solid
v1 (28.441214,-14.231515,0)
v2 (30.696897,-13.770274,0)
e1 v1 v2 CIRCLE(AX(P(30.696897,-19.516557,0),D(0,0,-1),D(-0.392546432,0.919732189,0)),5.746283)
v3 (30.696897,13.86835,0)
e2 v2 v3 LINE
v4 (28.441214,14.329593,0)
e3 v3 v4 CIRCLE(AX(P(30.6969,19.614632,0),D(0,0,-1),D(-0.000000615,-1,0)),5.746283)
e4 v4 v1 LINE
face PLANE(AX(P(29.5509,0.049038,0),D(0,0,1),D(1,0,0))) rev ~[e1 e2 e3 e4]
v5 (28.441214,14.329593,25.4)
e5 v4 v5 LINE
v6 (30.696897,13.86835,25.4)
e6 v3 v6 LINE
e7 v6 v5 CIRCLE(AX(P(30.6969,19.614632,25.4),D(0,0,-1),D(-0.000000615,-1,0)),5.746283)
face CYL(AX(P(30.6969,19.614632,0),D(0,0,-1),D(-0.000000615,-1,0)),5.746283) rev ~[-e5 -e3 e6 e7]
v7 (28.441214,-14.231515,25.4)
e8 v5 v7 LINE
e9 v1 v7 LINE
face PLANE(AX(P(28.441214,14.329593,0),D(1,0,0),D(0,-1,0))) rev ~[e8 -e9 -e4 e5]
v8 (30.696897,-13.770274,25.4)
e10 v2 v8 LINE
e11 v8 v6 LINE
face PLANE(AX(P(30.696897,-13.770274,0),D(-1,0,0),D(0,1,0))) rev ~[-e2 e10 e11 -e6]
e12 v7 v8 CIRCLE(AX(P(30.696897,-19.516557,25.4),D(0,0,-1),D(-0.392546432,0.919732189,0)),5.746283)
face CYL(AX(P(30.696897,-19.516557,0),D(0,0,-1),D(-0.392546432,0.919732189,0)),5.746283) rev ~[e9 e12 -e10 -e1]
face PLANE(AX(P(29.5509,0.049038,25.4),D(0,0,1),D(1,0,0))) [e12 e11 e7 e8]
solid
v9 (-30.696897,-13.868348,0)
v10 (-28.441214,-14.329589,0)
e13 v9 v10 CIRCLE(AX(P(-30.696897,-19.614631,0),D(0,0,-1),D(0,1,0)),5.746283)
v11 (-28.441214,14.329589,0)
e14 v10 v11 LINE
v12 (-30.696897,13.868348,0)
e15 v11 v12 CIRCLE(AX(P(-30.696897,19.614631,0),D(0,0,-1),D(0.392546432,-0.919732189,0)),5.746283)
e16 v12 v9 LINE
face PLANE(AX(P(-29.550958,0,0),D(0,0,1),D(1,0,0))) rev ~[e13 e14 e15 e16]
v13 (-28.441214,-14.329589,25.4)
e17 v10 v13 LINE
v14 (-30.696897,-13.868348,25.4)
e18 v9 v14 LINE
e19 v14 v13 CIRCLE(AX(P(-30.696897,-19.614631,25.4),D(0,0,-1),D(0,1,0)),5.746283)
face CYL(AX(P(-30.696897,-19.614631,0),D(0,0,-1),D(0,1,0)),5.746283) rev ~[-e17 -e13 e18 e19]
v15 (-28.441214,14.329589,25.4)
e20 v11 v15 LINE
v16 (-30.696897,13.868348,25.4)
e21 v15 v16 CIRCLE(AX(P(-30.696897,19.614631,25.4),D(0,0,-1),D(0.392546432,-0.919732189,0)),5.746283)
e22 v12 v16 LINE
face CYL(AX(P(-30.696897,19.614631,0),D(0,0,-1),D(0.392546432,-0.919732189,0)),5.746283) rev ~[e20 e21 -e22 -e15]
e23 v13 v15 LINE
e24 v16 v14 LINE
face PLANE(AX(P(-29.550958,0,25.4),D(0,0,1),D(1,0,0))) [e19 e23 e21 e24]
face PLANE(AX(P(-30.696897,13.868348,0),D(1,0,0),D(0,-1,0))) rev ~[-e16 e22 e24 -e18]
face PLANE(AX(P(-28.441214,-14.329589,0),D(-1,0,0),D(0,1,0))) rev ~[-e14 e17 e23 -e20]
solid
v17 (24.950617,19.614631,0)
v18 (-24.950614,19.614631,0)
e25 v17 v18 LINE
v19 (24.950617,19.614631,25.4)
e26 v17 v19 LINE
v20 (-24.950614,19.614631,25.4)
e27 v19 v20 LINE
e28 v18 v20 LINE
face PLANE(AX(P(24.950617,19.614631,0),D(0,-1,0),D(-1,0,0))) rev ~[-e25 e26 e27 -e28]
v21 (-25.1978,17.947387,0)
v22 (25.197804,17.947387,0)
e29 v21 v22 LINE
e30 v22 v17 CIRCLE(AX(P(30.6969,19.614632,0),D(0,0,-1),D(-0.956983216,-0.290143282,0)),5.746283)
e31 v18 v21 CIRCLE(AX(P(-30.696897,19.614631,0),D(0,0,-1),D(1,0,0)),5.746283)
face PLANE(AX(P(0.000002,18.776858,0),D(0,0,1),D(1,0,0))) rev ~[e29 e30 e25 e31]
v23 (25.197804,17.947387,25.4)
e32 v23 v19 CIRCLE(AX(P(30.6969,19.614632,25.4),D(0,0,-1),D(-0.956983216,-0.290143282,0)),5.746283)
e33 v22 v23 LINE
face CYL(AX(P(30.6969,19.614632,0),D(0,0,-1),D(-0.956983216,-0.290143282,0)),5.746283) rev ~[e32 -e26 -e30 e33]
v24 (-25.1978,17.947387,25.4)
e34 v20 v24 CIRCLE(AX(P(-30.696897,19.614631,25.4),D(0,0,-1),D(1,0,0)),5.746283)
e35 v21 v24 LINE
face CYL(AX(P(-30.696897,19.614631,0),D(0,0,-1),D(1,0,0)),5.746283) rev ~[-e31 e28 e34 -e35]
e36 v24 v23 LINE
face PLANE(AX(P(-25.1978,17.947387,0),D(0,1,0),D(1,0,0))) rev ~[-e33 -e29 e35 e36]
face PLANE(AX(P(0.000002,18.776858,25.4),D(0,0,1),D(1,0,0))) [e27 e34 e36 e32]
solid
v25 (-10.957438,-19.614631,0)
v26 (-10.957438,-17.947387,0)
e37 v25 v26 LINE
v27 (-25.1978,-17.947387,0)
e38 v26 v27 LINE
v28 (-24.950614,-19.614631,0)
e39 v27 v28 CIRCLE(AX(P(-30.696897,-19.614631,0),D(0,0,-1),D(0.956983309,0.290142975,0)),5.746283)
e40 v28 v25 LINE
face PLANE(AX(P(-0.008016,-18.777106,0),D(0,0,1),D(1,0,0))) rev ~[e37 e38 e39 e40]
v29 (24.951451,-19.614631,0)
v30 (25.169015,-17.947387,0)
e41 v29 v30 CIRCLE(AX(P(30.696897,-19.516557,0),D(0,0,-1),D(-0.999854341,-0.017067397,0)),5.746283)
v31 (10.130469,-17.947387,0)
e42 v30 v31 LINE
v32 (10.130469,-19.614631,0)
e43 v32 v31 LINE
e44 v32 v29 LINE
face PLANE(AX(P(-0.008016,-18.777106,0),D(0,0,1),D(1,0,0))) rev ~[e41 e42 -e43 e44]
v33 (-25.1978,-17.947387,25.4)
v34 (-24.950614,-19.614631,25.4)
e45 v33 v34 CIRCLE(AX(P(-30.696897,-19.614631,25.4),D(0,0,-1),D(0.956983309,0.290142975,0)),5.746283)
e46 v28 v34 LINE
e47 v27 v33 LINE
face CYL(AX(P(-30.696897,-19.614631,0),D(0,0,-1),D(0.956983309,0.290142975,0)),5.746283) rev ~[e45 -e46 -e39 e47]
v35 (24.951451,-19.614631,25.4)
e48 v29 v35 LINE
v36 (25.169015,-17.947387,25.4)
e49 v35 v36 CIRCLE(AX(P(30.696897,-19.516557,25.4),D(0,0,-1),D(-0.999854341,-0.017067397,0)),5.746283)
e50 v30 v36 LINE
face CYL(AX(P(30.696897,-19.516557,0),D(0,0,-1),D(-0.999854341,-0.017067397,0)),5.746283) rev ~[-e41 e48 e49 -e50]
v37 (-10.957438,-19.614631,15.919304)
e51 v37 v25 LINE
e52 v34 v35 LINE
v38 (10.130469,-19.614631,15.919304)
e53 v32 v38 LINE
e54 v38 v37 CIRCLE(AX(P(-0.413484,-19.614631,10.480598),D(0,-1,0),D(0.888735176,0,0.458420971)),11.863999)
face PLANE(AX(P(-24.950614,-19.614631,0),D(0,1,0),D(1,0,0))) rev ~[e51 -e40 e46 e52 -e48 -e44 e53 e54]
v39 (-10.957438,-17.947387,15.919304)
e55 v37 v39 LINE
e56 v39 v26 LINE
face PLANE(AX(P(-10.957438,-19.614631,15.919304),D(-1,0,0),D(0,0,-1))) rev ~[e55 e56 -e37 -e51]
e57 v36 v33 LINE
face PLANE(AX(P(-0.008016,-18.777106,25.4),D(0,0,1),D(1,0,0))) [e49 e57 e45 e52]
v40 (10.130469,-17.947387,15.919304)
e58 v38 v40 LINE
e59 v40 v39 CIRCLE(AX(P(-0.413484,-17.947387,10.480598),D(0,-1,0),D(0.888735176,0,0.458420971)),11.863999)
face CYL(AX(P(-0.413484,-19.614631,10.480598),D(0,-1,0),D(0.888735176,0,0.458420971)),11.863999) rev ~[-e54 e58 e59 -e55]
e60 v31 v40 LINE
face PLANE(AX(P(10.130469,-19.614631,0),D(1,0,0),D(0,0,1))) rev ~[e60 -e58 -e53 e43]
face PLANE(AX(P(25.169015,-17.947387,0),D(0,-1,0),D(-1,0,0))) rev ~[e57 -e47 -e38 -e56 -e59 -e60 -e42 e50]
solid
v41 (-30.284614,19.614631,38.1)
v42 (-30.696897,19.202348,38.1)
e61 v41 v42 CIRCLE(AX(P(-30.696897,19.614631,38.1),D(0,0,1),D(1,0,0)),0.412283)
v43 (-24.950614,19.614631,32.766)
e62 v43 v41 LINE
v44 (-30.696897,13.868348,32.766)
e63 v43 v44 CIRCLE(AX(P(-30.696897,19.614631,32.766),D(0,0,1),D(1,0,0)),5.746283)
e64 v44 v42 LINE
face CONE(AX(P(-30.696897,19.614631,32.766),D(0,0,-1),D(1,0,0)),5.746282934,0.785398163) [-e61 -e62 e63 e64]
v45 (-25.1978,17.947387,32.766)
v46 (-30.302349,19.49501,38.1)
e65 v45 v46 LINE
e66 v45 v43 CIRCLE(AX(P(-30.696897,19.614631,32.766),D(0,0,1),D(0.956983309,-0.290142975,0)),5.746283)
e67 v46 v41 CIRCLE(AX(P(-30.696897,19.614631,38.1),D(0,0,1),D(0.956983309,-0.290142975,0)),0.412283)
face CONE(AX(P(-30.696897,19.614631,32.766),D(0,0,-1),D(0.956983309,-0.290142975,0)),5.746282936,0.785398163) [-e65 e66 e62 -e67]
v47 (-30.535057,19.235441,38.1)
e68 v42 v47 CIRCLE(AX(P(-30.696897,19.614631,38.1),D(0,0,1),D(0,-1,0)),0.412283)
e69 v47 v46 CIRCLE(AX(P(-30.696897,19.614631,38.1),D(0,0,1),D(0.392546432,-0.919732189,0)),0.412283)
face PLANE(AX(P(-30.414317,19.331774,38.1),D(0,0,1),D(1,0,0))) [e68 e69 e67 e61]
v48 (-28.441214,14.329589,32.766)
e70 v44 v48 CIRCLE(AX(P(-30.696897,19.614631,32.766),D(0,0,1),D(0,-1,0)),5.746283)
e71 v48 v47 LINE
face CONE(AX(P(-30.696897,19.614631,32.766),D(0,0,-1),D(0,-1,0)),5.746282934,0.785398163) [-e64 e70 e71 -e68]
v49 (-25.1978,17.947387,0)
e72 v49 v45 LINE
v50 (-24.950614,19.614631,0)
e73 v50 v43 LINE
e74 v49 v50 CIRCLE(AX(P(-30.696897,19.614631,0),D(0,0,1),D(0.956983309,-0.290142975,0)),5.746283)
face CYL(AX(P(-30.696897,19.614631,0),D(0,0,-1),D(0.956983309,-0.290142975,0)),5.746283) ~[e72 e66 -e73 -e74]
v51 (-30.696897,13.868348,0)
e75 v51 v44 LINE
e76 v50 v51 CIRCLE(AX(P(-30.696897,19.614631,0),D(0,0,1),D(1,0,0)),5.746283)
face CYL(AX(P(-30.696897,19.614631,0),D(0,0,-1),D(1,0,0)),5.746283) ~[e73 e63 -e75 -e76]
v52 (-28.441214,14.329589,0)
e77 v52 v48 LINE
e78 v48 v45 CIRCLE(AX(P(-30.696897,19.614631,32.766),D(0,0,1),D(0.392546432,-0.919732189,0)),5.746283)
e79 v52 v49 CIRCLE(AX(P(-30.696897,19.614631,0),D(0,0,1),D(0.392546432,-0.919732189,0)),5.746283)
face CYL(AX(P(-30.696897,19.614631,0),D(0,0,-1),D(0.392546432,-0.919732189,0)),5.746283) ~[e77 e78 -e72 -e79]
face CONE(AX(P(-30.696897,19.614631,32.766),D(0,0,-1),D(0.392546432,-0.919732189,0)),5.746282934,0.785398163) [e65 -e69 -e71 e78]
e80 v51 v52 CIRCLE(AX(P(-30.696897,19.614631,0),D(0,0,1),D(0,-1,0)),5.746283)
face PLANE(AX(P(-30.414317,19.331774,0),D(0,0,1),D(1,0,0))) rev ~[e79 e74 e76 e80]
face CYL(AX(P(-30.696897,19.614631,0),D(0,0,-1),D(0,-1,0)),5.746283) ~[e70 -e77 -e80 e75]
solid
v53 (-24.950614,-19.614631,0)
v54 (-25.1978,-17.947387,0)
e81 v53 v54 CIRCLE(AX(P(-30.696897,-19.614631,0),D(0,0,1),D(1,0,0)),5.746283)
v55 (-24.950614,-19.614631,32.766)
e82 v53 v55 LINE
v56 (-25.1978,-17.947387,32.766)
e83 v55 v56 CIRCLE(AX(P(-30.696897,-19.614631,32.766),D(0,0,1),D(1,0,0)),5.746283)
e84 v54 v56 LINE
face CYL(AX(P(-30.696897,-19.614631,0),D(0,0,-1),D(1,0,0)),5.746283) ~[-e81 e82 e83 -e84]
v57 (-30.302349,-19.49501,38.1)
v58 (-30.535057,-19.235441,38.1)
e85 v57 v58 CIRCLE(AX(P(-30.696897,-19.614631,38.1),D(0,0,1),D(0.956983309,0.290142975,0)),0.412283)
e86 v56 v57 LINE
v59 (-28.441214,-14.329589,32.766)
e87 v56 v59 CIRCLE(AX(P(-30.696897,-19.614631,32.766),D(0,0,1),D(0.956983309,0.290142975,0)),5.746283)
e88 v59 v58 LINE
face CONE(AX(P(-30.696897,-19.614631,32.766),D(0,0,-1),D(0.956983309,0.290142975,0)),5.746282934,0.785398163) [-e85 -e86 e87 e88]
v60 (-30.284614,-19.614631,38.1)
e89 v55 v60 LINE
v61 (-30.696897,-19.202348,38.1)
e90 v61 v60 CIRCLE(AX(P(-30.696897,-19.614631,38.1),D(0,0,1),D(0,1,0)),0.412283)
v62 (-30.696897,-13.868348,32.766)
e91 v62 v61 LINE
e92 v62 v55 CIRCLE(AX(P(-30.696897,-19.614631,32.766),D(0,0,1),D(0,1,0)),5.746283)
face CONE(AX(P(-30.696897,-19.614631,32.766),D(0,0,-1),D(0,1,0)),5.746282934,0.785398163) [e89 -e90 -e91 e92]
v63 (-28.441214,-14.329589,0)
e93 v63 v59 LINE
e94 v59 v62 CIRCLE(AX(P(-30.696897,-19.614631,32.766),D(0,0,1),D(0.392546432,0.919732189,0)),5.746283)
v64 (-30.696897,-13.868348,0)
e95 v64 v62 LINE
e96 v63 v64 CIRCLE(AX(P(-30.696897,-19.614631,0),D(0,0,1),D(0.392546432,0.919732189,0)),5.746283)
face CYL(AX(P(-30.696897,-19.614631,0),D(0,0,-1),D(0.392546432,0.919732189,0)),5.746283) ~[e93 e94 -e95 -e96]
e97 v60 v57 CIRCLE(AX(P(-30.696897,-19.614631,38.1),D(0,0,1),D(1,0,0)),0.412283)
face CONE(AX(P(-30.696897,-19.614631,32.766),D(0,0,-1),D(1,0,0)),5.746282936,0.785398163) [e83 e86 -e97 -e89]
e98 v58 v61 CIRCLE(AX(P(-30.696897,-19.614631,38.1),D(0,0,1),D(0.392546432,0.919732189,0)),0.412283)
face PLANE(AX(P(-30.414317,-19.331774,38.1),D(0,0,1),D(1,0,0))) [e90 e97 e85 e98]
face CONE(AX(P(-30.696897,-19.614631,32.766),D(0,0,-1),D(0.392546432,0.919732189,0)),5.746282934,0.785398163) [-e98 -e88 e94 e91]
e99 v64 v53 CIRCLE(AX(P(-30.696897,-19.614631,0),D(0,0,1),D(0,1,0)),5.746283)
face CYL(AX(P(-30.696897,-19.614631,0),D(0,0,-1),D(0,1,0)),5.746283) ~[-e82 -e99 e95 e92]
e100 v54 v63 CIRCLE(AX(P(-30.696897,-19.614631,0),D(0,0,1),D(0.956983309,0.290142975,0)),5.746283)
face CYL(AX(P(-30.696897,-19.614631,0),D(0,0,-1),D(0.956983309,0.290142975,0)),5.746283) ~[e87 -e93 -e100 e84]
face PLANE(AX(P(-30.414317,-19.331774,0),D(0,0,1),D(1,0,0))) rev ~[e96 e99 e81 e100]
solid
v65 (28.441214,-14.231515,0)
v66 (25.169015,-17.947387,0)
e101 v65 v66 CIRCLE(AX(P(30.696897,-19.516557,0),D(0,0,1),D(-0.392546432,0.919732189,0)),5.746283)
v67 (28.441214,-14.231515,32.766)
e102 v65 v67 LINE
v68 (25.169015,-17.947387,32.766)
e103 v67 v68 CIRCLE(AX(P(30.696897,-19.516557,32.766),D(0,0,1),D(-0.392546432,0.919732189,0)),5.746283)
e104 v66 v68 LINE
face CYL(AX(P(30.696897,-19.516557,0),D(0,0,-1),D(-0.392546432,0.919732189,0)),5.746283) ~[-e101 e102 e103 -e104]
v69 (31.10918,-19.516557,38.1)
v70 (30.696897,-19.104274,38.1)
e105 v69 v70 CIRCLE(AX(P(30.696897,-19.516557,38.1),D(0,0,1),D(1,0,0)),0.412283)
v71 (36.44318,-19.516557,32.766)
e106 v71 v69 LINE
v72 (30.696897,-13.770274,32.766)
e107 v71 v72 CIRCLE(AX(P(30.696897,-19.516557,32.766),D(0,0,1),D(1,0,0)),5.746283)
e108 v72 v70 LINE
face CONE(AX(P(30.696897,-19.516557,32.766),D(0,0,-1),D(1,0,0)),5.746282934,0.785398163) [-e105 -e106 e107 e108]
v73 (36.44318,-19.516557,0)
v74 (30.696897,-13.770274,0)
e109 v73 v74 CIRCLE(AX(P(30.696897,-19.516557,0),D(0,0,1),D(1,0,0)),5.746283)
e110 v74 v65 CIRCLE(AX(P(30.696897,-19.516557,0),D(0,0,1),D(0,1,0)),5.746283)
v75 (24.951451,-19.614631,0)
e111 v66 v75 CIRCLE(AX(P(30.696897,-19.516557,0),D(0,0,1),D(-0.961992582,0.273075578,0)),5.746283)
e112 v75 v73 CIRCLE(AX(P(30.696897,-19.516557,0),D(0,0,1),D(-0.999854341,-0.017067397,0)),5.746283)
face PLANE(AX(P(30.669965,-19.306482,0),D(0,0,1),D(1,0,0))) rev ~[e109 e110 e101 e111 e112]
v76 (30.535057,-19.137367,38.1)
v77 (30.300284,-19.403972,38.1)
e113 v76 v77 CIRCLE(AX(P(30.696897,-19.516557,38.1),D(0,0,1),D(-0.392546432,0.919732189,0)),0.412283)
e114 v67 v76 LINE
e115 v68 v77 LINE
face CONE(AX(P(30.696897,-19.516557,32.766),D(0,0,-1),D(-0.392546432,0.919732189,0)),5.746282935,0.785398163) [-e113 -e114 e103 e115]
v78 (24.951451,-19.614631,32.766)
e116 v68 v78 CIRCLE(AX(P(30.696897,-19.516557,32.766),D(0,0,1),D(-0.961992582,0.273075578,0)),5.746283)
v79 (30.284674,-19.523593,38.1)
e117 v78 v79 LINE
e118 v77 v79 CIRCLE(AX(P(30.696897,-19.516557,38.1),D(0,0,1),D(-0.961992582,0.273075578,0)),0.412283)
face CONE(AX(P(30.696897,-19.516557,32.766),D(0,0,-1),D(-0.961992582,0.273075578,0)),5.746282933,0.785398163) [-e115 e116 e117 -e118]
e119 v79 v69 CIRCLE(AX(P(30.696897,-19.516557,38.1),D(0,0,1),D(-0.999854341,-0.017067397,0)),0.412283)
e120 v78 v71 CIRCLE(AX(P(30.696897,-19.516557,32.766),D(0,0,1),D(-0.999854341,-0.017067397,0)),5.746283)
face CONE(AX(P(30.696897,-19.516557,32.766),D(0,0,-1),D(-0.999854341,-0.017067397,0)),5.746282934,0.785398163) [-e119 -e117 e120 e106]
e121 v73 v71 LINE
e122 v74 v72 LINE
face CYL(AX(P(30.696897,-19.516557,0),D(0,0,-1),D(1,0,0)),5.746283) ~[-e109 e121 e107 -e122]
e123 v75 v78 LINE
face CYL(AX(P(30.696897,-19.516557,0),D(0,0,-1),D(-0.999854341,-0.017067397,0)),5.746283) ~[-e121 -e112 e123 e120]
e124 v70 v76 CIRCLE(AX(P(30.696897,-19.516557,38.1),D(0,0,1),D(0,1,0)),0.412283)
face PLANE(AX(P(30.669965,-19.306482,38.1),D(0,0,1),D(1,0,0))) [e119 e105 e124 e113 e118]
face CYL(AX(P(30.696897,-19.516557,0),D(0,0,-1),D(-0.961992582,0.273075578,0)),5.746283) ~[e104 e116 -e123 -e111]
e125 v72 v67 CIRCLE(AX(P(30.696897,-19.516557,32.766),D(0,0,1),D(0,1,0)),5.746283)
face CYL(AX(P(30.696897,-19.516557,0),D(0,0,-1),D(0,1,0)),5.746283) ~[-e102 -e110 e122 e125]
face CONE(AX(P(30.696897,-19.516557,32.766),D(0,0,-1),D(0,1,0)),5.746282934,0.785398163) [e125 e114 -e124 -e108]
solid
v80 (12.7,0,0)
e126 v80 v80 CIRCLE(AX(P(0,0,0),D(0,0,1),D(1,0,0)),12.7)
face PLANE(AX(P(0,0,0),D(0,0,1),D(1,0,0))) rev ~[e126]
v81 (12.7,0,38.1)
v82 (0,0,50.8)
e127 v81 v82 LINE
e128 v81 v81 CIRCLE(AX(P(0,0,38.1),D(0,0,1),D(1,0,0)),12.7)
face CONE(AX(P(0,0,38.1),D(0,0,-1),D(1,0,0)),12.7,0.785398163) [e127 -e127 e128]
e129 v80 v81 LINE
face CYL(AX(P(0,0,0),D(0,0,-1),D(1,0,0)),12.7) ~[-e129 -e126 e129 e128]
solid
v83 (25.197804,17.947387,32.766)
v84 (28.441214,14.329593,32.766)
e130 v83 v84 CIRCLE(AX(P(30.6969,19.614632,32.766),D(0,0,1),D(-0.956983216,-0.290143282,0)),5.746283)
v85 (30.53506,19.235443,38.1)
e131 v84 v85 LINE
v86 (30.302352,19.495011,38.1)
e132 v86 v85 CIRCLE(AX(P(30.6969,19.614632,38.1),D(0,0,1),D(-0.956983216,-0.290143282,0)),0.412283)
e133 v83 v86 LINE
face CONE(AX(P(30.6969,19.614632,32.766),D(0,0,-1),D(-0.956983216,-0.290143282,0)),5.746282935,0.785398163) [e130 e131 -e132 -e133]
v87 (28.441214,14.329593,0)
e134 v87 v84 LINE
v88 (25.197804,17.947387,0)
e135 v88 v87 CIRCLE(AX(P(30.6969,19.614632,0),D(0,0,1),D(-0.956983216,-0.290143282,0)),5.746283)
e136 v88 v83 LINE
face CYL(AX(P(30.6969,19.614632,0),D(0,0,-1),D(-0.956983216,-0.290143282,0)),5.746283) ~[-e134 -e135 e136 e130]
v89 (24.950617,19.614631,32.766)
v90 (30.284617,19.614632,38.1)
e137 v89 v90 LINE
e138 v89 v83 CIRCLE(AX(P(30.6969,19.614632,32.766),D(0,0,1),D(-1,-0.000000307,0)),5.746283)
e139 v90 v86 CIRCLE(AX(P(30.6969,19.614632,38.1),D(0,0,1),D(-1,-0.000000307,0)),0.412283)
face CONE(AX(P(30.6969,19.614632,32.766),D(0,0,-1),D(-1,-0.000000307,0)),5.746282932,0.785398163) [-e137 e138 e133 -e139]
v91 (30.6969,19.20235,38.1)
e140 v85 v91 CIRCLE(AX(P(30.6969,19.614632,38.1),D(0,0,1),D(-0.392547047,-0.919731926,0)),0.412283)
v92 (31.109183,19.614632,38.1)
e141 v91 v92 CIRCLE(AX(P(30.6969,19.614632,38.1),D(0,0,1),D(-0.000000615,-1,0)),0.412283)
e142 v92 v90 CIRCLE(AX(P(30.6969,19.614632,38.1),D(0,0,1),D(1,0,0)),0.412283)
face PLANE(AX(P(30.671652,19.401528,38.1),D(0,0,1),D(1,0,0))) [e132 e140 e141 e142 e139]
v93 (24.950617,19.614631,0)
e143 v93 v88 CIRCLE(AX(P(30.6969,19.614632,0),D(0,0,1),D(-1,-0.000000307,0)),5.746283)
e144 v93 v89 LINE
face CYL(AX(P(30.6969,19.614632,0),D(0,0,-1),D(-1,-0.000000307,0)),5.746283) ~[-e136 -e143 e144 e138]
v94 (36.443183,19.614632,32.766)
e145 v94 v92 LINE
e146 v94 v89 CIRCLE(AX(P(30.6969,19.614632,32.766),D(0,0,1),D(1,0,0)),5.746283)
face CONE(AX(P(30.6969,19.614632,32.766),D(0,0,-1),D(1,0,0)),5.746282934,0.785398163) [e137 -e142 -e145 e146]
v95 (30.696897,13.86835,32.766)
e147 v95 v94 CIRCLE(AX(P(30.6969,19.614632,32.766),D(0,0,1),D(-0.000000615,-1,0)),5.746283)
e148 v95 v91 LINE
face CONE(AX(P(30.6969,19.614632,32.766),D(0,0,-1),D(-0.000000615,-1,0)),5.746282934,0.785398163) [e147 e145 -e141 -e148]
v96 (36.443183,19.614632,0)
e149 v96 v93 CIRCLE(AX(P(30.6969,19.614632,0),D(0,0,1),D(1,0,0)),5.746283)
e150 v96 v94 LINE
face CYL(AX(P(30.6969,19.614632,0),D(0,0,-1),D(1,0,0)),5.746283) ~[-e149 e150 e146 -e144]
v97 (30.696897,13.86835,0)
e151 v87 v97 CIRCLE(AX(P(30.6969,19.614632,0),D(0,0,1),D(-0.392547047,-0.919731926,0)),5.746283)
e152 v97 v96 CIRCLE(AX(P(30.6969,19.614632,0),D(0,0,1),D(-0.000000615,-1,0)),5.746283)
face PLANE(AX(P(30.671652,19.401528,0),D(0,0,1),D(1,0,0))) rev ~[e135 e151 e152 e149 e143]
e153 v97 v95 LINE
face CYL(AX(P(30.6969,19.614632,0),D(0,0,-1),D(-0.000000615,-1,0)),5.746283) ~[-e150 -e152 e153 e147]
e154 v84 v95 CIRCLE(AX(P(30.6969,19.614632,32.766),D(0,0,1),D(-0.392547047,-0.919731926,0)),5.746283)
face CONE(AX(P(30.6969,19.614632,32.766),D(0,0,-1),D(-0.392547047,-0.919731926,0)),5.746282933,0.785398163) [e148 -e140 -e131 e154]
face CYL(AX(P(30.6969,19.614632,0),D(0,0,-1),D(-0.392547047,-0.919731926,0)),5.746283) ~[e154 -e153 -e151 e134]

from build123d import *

# Parameters (mm, degrees)
F1_DEPTH  = 25.4
F2_DEPTH  = 38.1
F0_R      = 12.7
F3_DEPTH  = 50.8
F5_DEPTH  = 25.4
F6_SIZE   = 12.7
F7_SIZE   = 5.334
F7_2_SIZE = 5.334
F7_3_SIZE = 5.334
F7_4_SIZE = 5.334


# Not quite as in the source:
# - a feature names something its author has since deleted; it is built from what else it names


with BuildPart() as f1:
    # F0 (on Top) → F1 (new body)
    with BuildSketch(Plane.XY):
        with BuildLine():
            Line((24.9506174104, 19.6146306736), (-24.950613876, 19.6146306736))
            ThreePointArc((-24.950613876, 19.6146306736), (-25.0127463025, 18.7718966911), (-25.1977999521, 17.9473870487))
            Line((-25.1977999521, 17.9473870487), (25.1978040222, 17.9473870487))
            ThreePointArc((25.1978040222, 17.9473870487), (25.0127501018, 18.771896671), (24.9506174104, 19.6146306736))
        make_face()
    extrude(amount=F1_DEPTH)


with BuildPart() as f1b:
    # F0 (on Top) → F1, piece 2 (new body)
    with BuildSketch(Plane.XY):
        with BuildLine():
            Line((-30.6968968099, 13.8683477398), (-30.6968968099, -13.8683477398))
            ThreePointArc((-30.6968968099, -13.8683477398), (-29.54571818, -13.9848389086), (-28.4412139466, -14.3295892948))
            Line((-28.4412139466, -14.3295892948), (-28.4412139466, 14.3295892948))
            ThreePointArc((-28.4412139466, 14.3295892948), (-29.54571818, 13.9848389086), (-30.6968968099, 13.8683477398))
        make_face()
    extrude(amount=F1_DEPTH)


with BuildPart() as f1c:
    # F0 (on Top) → F1, piece 3 (new body)
    with BuildSketch(Plane.XY):
        with BuildLine():
            ThreePointArc((-25.1977999521, -17.9473870487), (-25.0127463025, -18.7718966911), (-24.950613876, -19.6146306736))
            Line((-24.950613876, -19.6146306736), (24.9514508717, -19.6146306736))
            ThreePointArc((24.9514508717, -19.6146306736), (24.9989231754, -18.7730083224), (25.1690152512, -17.9473870487))
            Line((25.1690152512, -17.9473870487), (-25.1977999521, -17.9473870487))
        make_face()
    extrude(amount=F1_DEPTH)

    # F4 (on face) → F5 (cut)
    with BuildSketch(Plane.XZ.offset(19.6146306736)):
        with BuildLine():
            Line((-10.9574375674, 15.9193035215), (-10.9574375674, 0))
            Line((-10.9574375674, 0), (10.130468756, 0))
            Line((10.130468756, 0), (10.130468756, 15.9193035215))
            ThreePointArc((10.130468756, 15.9193035215), (-0.4134844057, 22.3445965305), (-10.9574375674, 15.9193035215))
        make_face()
    extrude(amount=-F5_DEPTH, mode=Mode.SUBTRACT)


with BuildPart() as f1d:
    # F0 (on Top) → F1, piece 4 (new body)
    with BuildSketch(Plane.XY):
        with BuildLine():
            Line((28.4412139466, 14.3295925704), (28.4412139466, -14.2315152048))
            ThreePointArc((28.4412139466, -14.2315152048), (29.54571818, -13.8867648186), (30.6968968099, -13.7702736498))
            Line((30.6968968099, -13.7702736498), (30.6968968099, 13.868349507))
            ThreePointArc((30.6968968099, 13.868349507), (29.5457181005, 13.9848414147), (28.4412139466, 14.3295925704))
        make_face()
    extrude(amount=F1_DEPTH)


with BuildPart() as f2:
    # F0 (on Top) → F2 (new body)
    with BuildSketch(Plane.XY):
        with BuildLine():
            ThreePointArc((-24.950613876, 19.6146306736), (-34.760132439, 23.6778663028), (-30.6968968099, 13.8683477398))
            ThreePointArc((-30.6968968099, 13.8683477398), (-29.54571818, 13.9848389086), (-28.4412139466, 14.3295892948))
            ThreePointArc((-28.4412139466, 14.3295892948), (-26.4183144188, 15.778812602), (-25.1977999521, 17.9473870487))
            ThreePointArc((-25.1977999521, 17.9473870487), (-25.0127463025, 18.7718966911), (-24.950613876, 19.6146306736))
        make_face()
    extrude(amount=F2_DEPTH)

    # F7
    f7_edges = [f2.edges().sort_by_distance(p)[0] for p in [
        (-30.696897, 25.360914, 38.1),
    ]]
    chamfer(f7_edges, length=F7_SIZE)


with BuildPart() as f2b:
    # F0 (on Top) → F2, piece 2 (new body)
    with BuildSketch(Plane.XY):
        with BuildLine():
            ThreePointArc((25.1978040222, 17.9473870487), (26.4183172869, 15.7788151124), (28.4412139466, 14.3295925704))
            ThreePointArc((28.4412139466, 14.3295925704), (29.5457181005, 13.9848414147), (30.6968968099, 13.868349507))
            ThreePointArc((30.6968968099, 13.868349507), (34.7601347238, 15.5513955621), (36.4431832781, 19.6146324408))
            ThreePointArc((36.4431832781, 19.6146324408), (30.6968994606, 25.3609153747), (24.9506174104, 19.6146306736))
            ThreePointArc((24.9506174104, 19.6146306736), (25.0127501018, 18.771896671), (25.1978040222, 17.9473870487))
        make_face()
    extrude(amount=F2_DEPTH)

    # F7#2
    f7_2_edges = [f2b.edges().sort_by_distance(p)[0] for p in [
        (36.443183, 19.614634, 38.1),
    ]]
    chamfer(f7_2_edges, length=F7_2_SIZE)


with BuildPart() as f2c:
    # F0 (on Top) → F2, piece 3 (new body)
    with BuildSketch(Plane.XY):
        with BuildLine():
            ThreePointArc((-30.6968968099, -13.8683477398), (-34.760132439, -23.6778663028), (-24.950613876, -19.6146306736))
            ThreePointArc((-24.950613876, -19.6146306736), (-25.0127463025, -18.7718966911), (-25.1977999521, -17.9473870487))
            ThreePointArc((-25.1977999521, -17.9473870487), (-26.4183144188, -15.778812602), (-28.4412139466, -14.3295892948))
            ThreePointArc((-28.4412139466, -14.3295892948), (-29.54571818, -13.9848389086), (-30.6968968099, -13.8683477398))
        make_face()
    extrude(amount=F2_DEPTH)

    # F7#3
    f7_3_edges = [f2c.edges().sort_by_distance(p)[0] for p in [
        (-36.44318, -19.614631, 38.1),
    ]]
    chamfer(f7_3_edges, length=F7_3_SIZE)


with BuildPart() as f2d:
    # F0 (on Top) → F2, piece 4 (new body)
    with BuildSketch(Plane.XY):
        with BuildLine():
            ThreePointArc((25.1690152512, -17.9473870487), (24.9989231754, -18.7730083224), (24.9514508717, -19.6146306736))
            ThreePointArc((24.9514508717, -19.6146306736), (30.7459356406, -25.2626302648), (36.4431797437, -19.5165565837))
            ThreePointArc((36.4431797437, -19.5165565837), (34.760132439, -15.4533209545), (30.6968968099, -13.7702736498))
            ThreePointArc((30.6968968099, -13.7702736498), (29.54571818, -13.8867648186), (28.4412139466, -14.2315152048))
            ThreePointArc((28.4412139466, -14.2315152048), (26.3843691674, -15.718942479), (25.1690152512, -17.9473870487))
        make_face()
    extrude(amount=F2_DEPTH)

    # F7#4
    f7_4_edges = [f2d.edges().sort_by_distance(p)[0] for p in [
        (36.442343, -19.418482, 38.1),
    ]]
    chamfer(f7_4_edges, length=F7_4_SIZE)


with BuildPart() as f3:
    # F0 (on Top) → F3 (new body)
    with BuildSketch(Plane.XY):
        Circle(F0_R)
    extrude(amount=F3_DEPTH)

    # F6
    f6_edges = [f3.edges().sort_by_distance(p)[0] for p in [
        (-12.7, 0, 50.8),
    ]]
    chamfer(f6_edges, length=F6_SIZE)


solid = Compound([f1.part, f1b.part, f1c.part, f1d.part, f2.part, f2b.part, f2c.part, f2d.part, f3.part])
